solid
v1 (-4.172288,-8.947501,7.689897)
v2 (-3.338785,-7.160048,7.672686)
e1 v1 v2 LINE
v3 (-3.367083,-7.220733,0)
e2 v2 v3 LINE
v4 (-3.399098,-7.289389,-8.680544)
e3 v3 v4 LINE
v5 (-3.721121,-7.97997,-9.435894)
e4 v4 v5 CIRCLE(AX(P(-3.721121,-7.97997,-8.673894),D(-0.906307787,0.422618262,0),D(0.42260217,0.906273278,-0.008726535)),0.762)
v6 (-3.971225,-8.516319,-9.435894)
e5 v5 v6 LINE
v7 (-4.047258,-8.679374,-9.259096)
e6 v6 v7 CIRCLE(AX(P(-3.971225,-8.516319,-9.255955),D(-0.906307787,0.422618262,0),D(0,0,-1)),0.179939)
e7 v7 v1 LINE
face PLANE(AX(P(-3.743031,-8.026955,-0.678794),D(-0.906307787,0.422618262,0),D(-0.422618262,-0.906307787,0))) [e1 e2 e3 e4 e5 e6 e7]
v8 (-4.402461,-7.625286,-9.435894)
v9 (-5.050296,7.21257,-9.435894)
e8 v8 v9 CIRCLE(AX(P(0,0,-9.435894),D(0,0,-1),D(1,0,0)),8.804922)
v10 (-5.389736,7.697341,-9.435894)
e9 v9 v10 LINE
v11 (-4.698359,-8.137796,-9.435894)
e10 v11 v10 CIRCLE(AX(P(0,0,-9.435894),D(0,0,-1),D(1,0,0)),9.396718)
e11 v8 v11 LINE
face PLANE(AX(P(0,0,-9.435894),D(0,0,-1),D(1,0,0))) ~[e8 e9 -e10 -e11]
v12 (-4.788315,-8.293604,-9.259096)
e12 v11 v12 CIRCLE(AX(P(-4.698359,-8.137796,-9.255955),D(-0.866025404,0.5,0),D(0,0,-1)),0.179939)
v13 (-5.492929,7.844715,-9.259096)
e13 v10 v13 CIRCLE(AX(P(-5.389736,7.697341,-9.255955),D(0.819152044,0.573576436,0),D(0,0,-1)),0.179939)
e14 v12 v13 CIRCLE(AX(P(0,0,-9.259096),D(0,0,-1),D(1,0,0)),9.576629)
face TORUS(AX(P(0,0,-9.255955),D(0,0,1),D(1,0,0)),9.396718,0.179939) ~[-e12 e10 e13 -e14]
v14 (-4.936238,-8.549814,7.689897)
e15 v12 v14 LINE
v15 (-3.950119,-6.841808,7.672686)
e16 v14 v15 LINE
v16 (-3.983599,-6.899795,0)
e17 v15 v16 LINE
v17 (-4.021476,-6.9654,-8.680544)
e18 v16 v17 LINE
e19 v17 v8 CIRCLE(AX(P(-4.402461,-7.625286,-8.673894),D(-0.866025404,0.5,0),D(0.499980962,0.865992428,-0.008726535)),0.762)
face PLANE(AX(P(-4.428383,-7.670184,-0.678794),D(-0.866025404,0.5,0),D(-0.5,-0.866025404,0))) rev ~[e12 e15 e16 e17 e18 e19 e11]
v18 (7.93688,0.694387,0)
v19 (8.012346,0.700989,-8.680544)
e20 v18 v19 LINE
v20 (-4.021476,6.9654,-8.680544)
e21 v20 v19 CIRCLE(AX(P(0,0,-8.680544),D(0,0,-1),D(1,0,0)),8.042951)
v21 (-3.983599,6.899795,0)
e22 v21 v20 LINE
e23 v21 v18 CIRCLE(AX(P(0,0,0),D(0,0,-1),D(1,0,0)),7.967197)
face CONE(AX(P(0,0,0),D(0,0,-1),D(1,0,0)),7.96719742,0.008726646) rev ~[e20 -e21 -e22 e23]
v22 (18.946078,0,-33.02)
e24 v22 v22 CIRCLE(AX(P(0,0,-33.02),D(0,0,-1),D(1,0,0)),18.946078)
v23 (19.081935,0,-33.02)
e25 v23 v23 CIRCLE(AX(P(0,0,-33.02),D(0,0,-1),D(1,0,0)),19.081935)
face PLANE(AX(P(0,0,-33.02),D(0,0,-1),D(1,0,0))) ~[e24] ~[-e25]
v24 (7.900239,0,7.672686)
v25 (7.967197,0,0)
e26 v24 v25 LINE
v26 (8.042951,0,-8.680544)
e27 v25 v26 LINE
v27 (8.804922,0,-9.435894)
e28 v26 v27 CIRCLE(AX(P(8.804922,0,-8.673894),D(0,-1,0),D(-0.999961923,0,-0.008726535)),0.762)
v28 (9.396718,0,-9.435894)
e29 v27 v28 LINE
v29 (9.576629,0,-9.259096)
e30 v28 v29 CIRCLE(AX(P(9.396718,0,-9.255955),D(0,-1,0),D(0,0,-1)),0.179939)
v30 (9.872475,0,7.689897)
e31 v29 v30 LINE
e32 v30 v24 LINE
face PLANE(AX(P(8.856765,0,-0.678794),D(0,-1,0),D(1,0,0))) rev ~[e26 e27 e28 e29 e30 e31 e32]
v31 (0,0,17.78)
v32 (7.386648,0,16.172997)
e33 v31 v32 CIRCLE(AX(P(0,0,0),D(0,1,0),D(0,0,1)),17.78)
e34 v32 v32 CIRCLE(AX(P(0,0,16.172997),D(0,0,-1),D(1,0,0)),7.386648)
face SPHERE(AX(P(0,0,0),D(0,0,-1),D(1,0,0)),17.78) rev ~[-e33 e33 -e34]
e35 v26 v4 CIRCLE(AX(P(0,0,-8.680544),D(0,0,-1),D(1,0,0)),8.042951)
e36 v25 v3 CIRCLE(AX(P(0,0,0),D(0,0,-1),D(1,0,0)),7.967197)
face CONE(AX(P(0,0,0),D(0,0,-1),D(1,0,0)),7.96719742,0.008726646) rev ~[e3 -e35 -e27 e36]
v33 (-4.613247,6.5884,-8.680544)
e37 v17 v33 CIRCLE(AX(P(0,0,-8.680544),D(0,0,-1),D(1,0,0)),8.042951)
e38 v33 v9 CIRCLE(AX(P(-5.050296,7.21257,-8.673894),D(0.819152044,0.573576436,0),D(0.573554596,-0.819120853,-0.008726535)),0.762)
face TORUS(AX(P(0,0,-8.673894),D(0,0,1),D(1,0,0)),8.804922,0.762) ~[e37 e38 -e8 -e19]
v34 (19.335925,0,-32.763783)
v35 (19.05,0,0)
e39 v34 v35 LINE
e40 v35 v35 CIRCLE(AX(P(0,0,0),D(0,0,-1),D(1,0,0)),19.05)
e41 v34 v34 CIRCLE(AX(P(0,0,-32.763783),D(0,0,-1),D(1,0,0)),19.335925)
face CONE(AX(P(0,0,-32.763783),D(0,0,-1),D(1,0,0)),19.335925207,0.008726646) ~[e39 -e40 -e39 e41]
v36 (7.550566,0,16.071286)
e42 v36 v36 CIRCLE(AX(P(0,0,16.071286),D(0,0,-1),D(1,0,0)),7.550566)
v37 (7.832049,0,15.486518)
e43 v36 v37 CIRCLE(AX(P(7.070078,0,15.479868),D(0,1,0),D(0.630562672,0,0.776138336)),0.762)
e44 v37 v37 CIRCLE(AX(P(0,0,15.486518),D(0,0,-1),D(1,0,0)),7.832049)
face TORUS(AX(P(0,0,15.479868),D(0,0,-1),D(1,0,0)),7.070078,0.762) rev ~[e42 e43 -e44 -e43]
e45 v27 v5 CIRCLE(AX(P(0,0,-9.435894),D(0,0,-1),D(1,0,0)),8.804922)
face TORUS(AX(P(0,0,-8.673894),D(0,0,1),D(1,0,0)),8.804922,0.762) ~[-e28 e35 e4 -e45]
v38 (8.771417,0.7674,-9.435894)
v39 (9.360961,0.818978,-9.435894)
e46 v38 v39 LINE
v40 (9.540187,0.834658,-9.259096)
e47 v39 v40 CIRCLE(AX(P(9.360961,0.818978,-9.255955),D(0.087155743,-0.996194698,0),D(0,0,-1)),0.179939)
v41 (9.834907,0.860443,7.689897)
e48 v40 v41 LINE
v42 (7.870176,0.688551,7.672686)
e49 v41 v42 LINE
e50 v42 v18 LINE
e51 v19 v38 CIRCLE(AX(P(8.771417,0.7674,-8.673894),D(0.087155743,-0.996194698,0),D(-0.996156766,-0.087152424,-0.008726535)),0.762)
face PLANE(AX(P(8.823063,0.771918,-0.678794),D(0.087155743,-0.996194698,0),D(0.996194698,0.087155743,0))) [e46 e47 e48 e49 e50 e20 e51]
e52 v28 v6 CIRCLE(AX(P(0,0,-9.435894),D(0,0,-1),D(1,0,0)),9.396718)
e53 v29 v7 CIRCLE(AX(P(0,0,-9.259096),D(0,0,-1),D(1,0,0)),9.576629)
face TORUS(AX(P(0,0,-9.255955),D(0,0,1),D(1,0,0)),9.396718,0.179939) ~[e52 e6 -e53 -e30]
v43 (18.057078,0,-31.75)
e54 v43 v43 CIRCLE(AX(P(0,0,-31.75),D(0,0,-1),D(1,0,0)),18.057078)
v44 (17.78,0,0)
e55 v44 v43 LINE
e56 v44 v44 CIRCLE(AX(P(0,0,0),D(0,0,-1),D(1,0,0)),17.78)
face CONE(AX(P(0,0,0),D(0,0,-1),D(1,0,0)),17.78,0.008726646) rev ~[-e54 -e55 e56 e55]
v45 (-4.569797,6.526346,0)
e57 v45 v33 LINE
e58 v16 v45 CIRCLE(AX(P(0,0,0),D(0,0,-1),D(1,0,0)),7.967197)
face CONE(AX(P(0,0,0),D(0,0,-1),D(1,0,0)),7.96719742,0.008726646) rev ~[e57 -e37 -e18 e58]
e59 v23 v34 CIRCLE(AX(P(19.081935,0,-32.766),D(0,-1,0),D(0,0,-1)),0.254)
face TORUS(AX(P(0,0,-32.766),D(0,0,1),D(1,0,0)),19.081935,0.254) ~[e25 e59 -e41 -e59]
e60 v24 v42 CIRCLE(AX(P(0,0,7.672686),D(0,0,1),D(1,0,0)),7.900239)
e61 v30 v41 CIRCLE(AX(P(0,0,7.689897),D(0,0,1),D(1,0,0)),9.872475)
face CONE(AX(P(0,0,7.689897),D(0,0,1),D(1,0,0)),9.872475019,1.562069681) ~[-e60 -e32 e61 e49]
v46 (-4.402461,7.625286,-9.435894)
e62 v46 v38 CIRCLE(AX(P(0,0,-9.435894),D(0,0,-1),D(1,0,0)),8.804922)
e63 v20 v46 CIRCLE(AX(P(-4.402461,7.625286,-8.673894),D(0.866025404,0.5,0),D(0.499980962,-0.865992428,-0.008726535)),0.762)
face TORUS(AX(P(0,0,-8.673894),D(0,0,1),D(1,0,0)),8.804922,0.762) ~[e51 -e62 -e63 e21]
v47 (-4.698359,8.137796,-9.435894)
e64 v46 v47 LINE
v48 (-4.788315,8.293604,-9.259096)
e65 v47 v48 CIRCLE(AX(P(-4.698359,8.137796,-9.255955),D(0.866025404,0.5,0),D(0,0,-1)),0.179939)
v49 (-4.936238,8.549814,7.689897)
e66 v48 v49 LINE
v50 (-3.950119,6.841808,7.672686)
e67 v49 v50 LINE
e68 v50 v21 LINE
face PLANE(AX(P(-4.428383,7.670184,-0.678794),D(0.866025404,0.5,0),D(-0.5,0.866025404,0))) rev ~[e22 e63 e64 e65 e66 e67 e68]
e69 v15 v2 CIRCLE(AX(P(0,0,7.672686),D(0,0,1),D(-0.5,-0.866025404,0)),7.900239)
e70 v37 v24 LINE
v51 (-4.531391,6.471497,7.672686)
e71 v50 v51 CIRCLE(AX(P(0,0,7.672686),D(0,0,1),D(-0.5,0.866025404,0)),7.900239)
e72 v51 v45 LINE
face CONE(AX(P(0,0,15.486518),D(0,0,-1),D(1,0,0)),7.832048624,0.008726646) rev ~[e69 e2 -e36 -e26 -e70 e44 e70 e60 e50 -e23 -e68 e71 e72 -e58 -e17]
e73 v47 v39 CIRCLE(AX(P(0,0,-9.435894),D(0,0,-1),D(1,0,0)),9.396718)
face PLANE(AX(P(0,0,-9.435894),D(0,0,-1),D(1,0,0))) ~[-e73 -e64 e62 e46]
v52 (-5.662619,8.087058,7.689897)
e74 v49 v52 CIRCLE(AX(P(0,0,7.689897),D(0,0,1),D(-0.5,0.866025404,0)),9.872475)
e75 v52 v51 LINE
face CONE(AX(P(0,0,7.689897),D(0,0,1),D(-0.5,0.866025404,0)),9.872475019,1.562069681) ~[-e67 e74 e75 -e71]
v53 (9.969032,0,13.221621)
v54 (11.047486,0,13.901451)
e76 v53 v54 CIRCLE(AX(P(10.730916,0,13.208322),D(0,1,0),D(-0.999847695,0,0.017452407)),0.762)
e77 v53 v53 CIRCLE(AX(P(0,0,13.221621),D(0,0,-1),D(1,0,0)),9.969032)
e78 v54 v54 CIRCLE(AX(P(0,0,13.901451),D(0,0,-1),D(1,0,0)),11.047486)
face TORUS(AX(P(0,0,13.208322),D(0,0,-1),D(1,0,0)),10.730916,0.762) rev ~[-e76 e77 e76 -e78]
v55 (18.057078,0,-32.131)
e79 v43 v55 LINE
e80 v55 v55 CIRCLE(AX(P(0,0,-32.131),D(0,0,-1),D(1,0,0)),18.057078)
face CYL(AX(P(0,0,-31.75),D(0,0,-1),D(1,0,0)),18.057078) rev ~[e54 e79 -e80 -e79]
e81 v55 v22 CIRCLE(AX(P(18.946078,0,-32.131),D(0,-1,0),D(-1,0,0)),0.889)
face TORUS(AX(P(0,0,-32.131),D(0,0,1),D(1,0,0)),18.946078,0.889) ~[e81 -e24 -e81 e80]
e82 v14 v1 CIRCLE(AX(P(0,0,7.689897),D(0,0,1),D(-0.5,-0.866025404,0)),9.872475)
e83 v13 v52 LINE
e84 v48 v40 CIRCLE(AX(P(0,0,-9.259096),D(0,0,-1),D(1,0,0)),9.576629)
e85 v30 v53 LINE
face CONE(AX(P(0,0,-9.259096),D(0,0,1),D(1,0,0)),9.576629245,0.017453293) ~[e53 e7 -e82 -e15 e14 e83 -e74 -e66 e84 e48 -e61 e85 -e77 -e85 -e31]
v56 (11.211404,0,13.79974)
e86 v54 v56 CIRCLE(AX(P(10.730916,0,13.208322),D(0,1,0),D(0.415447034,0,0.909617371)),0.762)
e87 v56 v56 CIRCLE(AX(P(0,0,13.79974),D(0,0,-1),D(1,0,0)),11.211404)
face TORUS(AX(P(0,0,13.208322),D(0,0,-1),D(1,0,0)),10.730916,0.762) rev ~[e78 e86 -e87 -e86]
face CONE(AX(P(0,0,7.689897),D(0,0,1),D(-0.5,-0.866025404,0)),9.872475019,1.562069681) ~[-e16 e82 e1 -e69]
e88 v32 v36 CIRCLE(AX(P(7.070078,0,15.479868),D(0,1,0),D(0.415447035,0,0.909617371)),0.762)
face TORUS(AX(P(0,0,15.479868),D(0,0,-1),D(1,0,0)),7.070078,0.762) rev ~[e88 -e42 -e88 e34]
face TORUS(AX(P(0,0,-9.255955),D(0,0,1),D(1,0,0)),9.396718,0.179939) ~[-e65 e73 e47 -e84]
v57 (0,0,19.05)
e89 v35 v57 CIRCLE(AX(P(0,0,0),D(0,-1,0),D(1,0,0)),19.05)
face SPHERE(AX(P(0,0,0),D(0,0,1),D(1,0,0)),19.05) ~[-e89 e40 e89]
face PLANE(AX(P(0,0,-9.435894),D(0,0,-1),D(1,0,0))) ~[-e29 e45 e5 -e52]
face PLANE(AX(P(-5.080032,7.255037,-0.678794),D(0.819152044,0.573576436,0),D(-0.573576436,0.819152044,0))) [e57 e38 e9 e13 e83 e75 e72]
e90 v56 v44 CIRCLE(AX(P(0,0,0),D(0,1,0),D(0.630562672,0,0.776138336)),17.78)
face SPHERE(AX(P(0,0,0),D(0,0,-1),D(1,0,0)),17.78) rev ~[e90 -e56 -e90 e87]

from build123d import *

# Parameters (mm, degrees)
F4_ANGLE        = 5
F4_COPIES_COUNT = 3


# Not quite as in the source:
# - a pattern or mirror of a feature is missing from the dataset's text; its kind, count and spacing are read off the source's solid
# - a feature names something its author has since deleted; it is built from what else it names


with BuildPart() as f1:
    # F0 (on Front) → F1 (revolve)
    with BuildSketch(Plane.XZ):
        with BuildLine():
            Line((19.3359252066, -32.76378346), (19.05, 0))
            ThreePointArc((19.05, 0), (13.4703841816, 13.4703841816), (0, 19.05))
            Line((0, 19.05), (0, 17.78))
            ThreePointArc((0, 17.78), (3.7797166534, 17.3736047503), (7.3866482795, 16.1729968526))
            ThreePointArc((7.3866482795, 16.1729968526), (7.4718390154, 16.1273495327), (7.5505663952, 16.071285828))
            Line((7.5505663952, 16.071285828), (11.0474861959, 13.9014506367))
            ThreePointArc((11.0474861959, 13.9014506367), (11.1326769319, 13.8558033168), (11.2114043116, 13.7997396121))
            ThreePointArc((11.2114043116, 13.7997396121), (16.0540831046, 7.641650062), (17.78, 0))
            Line((17.78, 0), (18.0570780524, -31.75))
            Line((18.0570780524, -31.75), (18.0570780524, -32.131))
            ThreePointArc((18.0570780524, -32.131), (18.3174601239, -32.7596179285), (18.9460780524, -33.02))
            Line((18.9460780524, -33.02), (19.0819348781, -33.02))
            ThreePointArc((19.0819348781, -33.02), (19.2623219635, -32.94481974), (19.3359252066, -32.76378346))
        make_face()
    revolve(axis=Axis((0, 0, -9.9657937262), (0, 0, -1)))

    # F0 (on Front) → F2 (revolve)
    with BuildSketch(Plane.XZ):
        with BuildLine():
            Line((11.0474861959, 13.9014506367), (7.5505663952, 16.071285828))
            ThreePointArc((7.5505663952, 16.071285828), (7.7566742417, 15.8103666839), (7.8320486243, 15.4865180361))
            Line((7.8320486243, 15.4865180361), (7.9671974198, 0))
            Line((7.9671974198, 0), (8.0429513757, -8.6805435522))
            ThreePointArc((8.0429513757, -8.6805435522), (8.268463141, -9.2150551884), (8.8049223611, -9.4358939321))
            Line((8.8049223611, -9.4358939321), (9.3967179228, -9.4358939321))
            ThreePointArc((9.3967179228, -9.4358939321), (9.5228386444, -9.3842965826), (9.5766292455, -9.2590955677))
            Line((9.5766292455, -9.2590955677), (9.9690316117, 13.2216209339))
            ThreePointArc((9.9690316117, 13.2216209339), (10.3245683016, 13.852935192), (11.0474861959, 13.9014506367))
        make_face()
    revolve(axis=Axis((0, 0, -9.9657937262), (0, 0, -1)))

    # F3 (on Front) → F4 (revolve, cut)
    with BuildSketch(Plane.XZ):
        with BuildLine():
            Line((7.9002389035, 7.6726859874), (8.0429513757, -8.6805435522))
            ThreePointArc((8.0429513757, -8.6805435522), (8.268463141, -9.2150551884), (8.8049223611, -9.4358939321))
            Line((8.8049223611, -9.4358939321), (9.3967179228, -9.4358939321))
            ThreePointArc((9.3967179228, -9.4358939321), (9.5228386444, -9.3842965826), (9.5766292455, -9.2590955677))
            Line((9.5766292455, -9.2590955677), (9.8724750188, 7.6898974312))
            Line((9.8724750188, 7.6898974312), (7.9002389035, 7.6726859874))
        make_face()
    f4 = revolve(axis=Axis((0, 0, -9.9657937262), (0, 0, 1)), revolution_arc=F4_ANGLE, mode=Mode.SUBTRACT)

    # F4_copies: F4 ×3 about axis
    f4_copies_axis = Axis((0, 0, 0), (0, 0, 1))
    for i in range(1, F4_COPIES_COUNT):
        add(f4.rotate(f4_copies_axis, i * 360 / F4_COPIES_COUNT), mode=Mode.SUBTRACT)


solid = f1.part
